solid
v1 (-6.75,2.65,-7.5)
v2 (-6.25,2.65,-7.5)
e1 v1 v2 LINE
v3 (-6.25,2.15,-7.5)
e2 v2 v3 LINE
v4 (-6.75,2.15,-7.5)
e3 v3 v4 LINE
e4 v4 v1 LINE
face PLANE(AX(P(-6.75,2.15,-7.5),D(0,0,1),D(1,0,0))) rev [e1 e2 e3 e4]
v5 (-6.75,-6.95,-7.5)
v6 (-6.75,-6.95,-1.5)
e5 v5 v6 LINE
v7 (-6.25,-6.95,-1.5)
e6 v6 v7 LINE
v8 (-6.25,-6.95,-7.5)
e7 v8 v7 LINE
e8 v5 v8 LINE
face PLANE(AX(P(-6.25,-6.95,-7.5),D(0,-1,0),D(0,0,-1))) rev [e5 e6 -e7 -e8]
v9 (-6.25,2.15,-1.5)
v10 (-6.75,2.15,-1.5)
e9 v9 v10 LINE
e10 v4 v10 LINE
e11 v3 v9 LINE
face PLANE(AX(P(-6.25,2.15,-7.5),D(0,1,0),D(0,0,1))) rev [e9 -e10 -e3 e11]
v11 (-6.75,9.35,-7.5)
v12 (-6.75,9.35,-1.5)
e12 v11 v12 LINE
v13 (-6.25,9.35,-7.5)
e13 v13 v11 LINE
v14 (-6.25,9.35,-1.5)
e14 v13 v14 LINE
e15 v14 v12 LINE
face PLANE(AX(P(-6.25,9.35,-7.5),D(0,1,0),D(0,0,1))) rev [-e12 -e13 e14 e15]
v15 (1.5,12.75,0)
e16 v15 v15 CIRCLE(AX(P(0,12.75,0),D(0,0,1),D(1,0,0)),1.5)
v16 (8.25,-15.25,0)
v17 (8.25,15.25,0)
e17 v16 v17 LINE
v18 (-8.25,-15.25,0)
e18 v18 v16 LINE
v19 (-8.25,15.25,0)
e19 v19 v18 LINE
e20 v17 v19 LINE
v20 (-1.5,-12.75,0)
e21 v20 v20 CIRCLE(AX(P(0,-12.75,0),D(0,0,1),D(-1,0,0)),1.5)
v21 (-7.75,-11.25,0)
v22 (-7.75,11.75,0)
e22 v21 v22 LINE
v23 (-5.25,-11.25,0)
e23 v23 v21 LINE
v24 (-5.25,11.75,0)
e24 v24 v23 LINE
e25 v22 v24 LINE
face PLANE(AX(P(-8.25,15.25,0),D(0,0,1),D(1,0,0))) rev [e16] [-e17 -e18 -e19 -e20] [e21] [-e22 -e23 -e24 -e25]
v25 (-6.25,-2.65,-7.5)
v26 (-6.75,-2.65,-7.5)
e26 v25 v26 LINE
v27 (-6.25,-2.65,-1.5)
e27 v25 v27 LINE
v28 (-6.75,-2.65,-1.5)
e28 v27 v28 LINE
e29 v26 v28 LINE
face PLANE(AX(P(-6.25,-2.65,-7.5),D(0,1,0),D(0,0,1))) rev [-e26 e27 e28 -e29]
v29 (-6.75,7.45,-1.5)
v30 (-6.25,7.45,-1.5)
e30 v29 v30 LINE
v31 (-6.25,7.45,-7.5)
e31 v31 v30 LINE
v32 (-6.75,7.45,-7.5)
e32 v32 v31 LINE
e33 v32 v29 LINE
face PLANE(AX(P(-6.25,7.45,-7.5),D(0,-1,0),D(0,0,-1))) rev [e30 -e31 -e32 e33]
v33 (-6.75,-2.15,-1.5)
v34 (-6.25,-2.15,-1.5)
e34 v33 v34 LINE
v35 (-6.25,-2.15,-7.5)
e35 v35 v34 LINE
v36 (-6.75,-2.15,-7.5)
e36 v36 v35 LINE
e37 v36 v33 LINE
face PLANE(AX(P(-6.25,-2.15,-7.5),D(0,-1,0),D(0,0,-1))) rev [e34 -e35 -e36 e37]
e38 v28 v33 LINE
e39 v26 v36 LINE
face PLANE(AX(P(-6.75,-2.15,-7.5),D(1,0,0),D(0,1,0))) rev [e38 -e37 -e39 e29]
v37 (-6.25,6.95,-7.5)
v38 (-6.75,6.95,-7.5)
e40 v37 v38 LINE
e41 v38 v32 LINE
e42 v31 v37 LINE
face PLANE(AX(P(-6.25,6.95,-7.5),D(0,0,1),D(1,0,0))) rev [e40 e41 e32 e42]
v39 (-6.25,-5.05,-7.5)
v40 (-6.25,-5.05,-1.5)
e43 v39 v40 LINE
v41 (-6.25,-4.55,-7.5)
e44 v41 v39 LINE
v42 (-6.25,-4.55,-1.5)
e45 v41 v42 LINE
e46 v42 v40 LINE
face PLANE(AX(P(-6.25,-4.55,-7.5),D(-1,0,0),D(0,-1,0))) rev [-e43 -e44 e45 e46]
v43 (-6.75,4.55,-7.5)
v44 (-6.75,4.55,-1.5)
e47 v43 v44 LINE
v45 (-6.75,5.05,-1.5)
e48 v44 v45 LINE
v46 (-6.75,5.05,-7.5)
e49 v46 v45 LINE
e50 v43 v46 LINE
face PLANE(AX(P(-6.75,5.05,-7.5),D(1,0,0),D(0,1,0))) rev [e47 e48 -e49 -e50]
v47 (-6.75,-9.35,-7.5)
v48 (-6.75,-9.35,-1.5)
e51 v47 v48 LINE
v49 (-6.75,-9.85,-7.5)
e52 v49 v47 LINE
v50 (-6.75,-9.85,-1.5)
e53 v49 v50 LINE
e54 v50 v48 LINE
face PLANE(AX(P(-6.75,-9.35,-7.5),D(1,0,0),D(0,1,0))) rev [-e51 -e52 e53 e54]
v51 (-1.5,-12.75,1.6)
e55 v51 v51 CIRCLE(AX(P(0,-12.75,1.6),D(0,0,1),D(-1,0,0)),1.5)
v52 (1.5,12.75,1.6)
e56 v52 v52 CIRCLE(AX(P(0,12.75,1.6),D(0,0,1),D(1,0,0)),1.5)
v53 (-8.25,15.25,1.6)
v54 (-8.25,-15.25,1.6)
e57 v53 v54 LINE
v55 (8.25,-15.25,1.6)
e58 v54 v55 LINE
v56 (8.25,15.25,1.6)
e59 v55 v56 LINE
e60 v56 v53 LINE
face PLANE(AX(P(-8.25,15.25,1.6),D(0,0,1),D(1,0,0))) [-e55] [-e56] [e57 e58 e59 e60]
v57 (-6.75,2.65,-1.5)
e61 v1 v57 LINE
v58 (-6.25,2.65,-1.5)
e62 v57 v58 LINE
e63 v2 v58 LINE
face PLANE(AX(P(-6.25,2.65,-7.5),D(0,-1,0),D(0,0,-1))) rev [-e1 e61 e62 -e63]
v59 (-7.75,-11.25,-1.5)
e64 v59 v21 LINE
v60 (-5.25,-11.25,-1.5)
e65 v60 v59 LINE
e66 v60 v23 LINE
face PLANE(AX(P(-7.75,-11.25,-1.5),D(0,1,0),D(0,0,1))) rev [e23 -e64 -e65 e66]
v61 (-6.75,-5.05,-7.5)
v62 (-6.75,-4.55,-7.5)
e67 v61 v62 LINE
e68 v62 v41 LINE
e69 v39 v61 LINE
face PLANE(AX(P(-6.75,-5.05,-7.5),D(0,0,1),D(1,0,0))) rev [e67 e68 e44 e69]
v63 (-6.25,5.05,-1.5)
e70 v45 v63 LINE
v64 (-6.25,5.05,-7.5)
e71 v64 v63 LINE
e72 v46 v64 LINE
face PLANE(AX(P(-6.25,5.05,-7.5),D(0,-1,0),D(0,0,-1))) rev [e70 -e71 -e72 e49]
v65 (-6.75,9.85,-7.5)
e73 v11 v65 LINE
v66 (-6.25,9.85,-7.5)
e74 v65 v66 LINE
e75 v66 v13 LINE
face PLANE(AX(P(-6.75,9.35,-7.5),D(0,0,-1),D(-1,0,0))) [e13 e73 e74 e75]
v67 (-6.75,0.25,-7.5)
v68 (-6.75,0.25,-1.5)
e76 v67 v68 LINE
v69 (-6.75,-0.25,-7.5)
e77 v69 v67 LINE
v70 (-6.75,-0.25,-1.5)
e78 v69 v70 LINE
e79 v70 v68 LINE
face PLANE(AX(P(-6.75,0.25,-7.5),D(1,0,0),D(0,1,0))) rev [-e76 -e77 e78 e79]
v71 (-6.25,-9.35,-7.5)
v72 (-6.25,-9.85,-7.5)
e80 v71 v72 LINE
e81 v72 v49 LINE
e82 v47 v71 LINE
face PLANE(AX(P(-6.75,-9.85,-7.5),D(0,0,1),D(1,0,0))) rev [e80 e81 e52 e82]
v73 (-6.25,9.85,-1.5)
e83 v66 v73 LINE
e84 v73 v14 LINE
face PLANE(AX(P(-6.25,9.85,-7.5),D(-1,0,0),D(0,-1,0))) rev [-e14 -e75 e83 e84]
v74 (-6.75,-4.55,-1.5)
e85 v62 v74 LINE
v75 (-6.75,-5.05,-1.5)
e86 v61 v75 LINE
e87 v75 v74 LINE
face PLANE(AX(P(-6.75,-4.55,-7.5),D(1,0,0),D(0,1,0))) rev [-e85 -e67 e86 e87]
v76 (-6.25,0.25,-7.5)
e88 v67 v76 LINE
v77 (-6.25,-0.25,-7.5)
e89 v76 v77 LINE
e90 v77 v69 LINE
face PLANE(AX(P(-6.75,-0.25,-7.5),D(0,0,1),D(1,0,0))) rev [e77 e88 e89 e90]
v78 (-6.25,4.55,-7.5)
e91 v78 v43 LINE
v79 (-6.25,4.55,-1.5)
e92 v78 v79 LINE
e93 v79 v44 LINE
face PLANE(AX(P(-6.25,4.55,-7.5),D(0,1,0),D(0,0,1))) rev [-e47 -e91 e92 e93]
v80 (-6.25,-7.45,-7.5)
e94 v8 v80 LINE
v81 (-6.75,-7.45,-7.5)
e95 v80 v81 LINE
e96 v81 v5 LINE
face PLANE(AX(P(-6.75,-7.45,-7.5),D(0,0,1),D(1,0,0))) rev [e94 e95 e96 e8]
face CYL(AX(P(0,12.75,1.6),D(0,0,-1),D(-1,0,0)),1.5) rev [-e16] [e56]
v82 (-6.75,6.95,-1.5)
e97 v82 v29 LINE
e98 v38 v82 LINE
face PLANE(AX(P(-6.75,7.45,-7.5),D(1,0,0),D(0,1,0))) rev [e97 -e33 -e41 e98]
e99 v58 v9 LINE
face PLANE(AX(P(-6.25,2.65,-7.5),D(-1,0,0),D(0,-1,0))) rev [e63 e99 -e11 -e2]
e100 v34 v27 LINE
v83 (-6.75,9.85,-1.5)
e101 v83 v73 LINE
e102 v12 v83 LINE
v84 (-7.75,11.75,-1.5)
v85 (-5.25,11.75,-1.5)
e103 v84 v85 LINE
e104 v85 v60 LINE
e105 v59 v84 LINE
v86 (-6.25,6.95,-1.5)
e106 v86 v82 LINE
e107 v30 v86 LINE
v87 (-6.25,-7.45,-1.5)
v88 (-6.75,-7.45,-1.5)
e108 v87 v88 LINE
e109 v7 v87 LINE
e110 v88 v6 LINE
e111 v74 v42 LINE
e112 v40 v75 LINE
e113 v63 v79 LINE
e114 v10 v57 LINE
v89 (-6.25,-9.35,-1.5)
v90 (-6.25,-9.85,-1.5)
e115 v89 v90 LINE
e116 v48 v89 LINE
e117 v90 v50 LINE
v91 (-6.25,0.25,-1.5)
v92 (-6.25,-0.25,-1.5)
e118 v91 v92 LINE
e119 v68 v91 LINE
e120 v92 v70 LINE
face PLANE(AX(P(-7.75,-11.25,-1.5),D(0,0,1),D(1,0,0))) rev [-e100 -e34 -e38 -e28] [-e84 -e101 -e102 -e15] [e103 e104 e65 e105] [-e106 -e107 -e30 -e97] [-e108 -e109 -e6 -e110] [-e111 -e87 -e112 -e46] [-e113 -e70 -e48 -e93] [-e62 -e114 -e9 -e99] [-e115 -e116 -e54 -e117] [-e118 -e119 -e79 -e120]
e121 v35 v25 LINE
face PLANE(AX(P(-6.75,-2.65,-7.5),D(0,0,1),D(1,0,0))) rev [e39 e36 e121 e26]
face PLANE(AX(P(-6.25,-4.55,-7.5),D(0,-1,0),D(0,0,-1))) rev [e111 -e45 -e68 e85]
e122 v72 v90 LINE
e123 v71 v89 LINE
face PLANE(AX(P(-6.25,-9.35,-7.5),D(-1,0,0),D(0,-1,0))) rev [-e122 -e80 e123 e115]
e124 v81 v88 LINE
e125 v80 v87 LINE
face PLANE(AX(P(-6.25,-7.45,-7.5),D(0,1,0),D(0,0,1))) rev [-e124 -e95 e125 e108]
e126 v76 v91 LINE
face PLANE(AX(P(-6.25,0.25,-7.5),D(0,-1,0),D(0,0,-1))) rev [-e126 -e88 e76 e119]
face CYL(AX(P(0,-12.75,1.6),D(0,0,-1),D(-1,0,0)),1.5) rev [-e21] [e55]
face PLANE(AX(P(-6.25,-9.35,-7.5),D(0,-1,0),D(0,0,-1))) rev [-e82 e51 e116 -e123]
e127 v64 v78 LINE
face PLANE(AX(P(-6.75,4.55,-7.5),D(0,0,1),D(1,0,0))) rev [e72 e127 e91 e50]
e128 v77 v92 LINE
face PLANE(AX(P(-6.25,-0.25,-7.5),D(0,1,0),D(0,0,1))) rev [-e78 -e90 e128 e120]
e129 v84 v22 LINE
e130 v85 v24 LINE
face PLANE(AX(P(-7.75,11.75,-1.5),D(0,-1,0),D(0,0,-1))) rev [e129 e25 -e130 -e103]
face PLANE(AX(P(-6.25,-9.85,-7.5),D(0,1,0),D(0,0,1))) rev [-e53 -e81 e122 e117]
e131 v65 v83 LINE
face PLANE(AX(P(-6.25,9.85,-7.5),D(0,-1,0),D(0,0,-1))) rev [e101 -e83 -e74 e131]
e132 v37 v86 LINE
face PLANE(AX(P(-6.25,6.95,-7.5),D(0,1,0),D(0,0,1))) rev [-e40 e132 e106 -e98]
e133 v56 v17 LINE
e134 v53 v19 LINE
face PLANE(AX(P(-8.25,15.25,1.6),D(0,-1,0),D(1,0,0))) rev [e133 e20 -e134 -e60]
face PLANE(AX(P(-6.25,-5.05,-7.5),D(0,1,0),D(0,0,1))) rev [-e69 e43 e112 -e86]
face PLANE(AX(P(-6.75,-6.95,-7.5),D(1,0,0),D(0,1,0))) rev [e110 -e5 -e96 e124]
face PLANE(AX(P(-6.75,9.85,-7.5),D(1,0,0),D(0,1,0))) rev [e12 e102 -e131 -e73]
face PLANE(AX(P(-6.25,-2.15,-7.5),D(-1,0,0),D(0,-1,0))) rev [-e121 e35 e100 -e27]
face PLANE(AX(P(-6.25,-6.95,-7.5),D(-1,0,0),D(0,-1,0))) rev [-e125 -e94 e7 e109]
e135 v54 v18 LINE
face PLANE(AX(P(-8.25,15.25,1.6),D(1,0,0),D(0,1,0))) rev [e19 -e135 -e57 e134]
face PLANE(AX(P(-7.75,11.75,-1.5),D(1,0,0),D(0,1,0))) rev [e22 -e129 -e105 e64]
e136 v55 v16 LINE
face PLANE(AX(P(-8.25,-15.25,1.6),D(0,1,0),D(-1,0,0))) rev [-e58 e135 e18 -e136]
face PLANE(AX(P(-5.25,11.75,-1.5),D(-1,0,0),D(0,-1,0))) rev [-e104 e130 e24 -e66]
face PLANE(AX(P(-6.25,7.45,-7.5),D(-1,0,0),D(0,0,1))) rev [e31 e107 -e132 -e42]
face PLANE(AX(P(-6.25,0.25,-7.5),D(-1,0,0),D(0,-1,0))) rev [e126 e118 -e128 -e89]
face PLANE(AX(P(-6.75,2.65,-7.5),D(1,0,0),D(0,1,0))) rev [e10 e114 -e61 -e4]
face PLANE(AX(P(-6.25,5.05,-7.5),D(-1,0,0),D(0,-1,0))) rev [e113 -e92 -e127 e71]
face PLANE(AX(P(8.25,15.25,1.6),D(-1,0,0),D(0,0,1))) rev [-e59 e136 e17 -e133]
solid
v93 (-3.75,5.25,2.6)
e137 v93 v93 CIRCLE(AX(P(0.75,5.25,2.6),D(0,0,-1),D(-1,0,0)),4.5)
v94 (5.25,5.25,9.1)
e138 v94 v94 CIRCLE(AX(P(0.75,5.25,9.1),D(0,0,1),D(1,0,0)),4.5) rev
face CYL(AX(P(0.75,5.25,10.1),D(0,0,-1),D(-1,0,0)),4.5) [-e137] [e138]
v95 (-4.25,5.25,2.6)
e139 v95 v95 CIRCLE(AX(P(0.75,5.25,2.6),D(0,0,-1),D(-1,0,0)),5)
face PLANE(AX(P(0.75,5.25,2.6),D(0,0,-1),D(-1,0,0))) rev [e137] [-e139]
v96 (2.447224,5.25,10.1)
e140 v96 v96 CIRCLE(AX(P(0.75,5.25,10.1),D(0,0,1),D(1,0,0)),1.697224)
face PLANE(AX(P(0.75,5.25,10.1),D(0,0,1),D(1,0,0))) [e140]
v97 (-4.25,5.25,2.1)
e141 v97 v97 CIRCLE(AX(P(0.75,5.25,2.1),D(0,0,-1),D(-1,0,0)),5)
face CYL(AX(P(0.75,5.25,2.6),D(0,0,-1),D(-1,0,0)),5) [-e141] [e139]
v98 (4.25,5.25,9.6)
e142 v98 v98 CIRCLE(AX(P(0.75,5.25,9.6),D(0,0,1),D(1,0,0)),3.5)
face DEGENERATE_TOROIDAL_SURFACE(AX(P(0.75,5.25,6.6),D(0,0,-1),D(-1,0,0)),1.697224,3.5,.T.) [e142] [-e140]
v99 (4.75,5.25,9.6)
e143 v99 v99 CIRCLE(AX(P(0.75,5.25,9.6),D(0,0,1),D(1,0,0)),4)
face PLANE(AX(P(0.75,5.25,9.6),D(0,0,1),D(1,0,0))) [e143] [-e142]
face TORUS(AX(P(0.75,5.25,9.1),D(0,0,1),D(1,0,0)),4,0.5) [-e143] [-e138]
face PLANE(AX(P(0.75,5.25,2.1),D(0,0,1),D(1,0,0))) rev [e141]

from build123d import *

# Parameters (mm, degrees)
SKETCH1_W          = 16.5
SKETCH1_H          = 30.5
SKETCH1_R          = 1.5
EXTRUDE1_DEPTH     = 1.6
EXTRUDE2_START     = 0.5
SKETCH2_R          = 4.5
EXTRUDE2_DEPTH     = 8
SKETCH3_R          = 4.5
SKETCH3_R_2        = 3.5
CUT_EXTRUDE1_DEPTH = 0.5
FILLET2_R          = 3.5
FILLET3_R          = 0.5
SKETCH4_R          = 5
EXTRUDE3_DEPTH     = 0.5
SKETCH5_W          = 2.5
SKETCH5_H          = 23
EXTRUDE4_DEPTH     = 1.5
SKETCH6_W          = 0.5
SKETCH6_H          = 0.5
EXTRUDE5_DEPTH     = 6


with BuildPart() as part:
    # Sketch1 → Extrude1 (new body)
    with BuildSketch(Plane.XY):
        Rectangle(SKETCH1_W, SKETCH1_H)
        with Locations((0, 12.75)):
            Circle(SKETCH1_R, mode=Mode.SUBTRACT)
        with Locations(Location((0, -12.75, 0), (0, 0, 180))):
            Circle(SKETCH1_R, mode=Mode.SUBTRACT)
    extrude(amount=EXTRUDE1_DEPTH)

    # Sketch5 → Extrude4 (add)
    with BuildSketch(Plane(origin=(0, 0, 0), x_dir=(-1, 0, 0), z_dir=(0, 0, -1))):
        with Locations((6.5, 0.25)):
            Rectangle(SKETCH5_W, SKETCH5_H)
    extrude(amount=EXTRUDE4_DEPTH)

    # Sketch6 → Extrude5 (add)
    with BuildSketch(Plane(origin=(0, 0, -1.5), x_dir=(-1, 0, 0), z_dir=(0, 0, -1))):
        with Locations((6.5, 9.6)):
            Rectangle(SKETCH6_W, SKETCH6_H)
        with Locations((6.5, 7.2)):
            Rectangle(SKETCH6_W, SKETCH6_H)
        with Locations((6.5, 4.8)):
            Rectangle(SKETCH6_W, SKETCH6_H)
        with Locations((6.5, 2.4)):
            Rectangle(SKETCH6_W, SKETCH6_H)
        with Locations((6.5, 0)):
            Rectangle(SKETCH6_W, SKETCH6_H)
        with Locations((6.5, -2.4)):
            Rectangle(SKETCH6_W, SKETCH6_H)
        with Locations((6.5, -4.8)):
            Rectangle(SKETCH6_W, SKETCH6_H)
        with Locations((6.5, -7.2)):
            Rectangle(SKETCH6_W, SKETCH6_H)
        with Locations((6.5, -9.6)):
            Rectangle(SKETCH6_W, SKETCH6_H)
    extrude(amount=EXTRUDE5_DEPTH)


with BuildPart() as body_2:
    # Sketch2 → Extrude2 (new body)
    with BuildSketch(Plane.XY.offset(1.6).offset(EXTRUDE2_START)):
        with Locations((0.75, 5.25)):
            Circle(SKETCH2_R)
    extrude(amount=EXTRUDE2_DEPTH)

    # Sketch3 → Cut-Extrude1 (cut)
    with BuildSketch(Plane.XY.offset(10.1)):
        with Locations((0.75, 5.25)):
            Circle(SKETCH3_R)
        with Locations((0.75, 5.25)):
            Circle(SKETCH3_R_2, mode=Mode.SUBTRACT)
    extrude(amount=-CUT_EXTRUDE1_DEPTH, mode=Mode.SUBTRACT)

    # Fillet2
    # the kernel refuses this fillet: 3.5 mm, written as the material it takes off along each edge
    with BuildSketch(Plane(origin=(0.75, 5.25, 10.1), x_dir=(1, 0, 0), z_dir=(0, -1, 0))) as fillet2_piece_1:
        with BuildLine():
            CenterArc((1.697224362, -3.5), FILLET2_R, 58.997280866, 31.002719134)
            Line((1.697224362, 0), (1.697224362, 0.07))
            Line((1.697224362, 0.07), (3.5, 0.07))
            Line((3.5, 0.07), (3.57, 0))
            ThreePointArc((3.57, 0), (3.57, -0.25), (3.536055513, -0.44))
            Line((3.536055513, -0.44), (3.5, -0.5))
        make_face()
    revolve(axis=Axis((0.75, 5.25, 10.1), (0, 0, 1)), mode=Mode.SUBTRACT)

    # Fillet3
    fillet3_edges = [body_2.edges().sort_by_distance(p)[0] for p in [
        (-3.75, 5.25, 9.6),
    ]]
    fillet(fillet3_edges, radius=FILLET3_R)

    # Sketch4 → Extrude3 (add)
    with BuildSketch(Plane(origin=(0, 0, 2.1), x_dir=(-1, 0, 0), z_dir=(0, 0, -1))):
        with Locations((-0.75, 5.25)):
            Circle(SKETCH4_R)
    extrude(amount=-EXTRUDE3_DEPTH)


solid = Compound([part.part, body_2.part])
